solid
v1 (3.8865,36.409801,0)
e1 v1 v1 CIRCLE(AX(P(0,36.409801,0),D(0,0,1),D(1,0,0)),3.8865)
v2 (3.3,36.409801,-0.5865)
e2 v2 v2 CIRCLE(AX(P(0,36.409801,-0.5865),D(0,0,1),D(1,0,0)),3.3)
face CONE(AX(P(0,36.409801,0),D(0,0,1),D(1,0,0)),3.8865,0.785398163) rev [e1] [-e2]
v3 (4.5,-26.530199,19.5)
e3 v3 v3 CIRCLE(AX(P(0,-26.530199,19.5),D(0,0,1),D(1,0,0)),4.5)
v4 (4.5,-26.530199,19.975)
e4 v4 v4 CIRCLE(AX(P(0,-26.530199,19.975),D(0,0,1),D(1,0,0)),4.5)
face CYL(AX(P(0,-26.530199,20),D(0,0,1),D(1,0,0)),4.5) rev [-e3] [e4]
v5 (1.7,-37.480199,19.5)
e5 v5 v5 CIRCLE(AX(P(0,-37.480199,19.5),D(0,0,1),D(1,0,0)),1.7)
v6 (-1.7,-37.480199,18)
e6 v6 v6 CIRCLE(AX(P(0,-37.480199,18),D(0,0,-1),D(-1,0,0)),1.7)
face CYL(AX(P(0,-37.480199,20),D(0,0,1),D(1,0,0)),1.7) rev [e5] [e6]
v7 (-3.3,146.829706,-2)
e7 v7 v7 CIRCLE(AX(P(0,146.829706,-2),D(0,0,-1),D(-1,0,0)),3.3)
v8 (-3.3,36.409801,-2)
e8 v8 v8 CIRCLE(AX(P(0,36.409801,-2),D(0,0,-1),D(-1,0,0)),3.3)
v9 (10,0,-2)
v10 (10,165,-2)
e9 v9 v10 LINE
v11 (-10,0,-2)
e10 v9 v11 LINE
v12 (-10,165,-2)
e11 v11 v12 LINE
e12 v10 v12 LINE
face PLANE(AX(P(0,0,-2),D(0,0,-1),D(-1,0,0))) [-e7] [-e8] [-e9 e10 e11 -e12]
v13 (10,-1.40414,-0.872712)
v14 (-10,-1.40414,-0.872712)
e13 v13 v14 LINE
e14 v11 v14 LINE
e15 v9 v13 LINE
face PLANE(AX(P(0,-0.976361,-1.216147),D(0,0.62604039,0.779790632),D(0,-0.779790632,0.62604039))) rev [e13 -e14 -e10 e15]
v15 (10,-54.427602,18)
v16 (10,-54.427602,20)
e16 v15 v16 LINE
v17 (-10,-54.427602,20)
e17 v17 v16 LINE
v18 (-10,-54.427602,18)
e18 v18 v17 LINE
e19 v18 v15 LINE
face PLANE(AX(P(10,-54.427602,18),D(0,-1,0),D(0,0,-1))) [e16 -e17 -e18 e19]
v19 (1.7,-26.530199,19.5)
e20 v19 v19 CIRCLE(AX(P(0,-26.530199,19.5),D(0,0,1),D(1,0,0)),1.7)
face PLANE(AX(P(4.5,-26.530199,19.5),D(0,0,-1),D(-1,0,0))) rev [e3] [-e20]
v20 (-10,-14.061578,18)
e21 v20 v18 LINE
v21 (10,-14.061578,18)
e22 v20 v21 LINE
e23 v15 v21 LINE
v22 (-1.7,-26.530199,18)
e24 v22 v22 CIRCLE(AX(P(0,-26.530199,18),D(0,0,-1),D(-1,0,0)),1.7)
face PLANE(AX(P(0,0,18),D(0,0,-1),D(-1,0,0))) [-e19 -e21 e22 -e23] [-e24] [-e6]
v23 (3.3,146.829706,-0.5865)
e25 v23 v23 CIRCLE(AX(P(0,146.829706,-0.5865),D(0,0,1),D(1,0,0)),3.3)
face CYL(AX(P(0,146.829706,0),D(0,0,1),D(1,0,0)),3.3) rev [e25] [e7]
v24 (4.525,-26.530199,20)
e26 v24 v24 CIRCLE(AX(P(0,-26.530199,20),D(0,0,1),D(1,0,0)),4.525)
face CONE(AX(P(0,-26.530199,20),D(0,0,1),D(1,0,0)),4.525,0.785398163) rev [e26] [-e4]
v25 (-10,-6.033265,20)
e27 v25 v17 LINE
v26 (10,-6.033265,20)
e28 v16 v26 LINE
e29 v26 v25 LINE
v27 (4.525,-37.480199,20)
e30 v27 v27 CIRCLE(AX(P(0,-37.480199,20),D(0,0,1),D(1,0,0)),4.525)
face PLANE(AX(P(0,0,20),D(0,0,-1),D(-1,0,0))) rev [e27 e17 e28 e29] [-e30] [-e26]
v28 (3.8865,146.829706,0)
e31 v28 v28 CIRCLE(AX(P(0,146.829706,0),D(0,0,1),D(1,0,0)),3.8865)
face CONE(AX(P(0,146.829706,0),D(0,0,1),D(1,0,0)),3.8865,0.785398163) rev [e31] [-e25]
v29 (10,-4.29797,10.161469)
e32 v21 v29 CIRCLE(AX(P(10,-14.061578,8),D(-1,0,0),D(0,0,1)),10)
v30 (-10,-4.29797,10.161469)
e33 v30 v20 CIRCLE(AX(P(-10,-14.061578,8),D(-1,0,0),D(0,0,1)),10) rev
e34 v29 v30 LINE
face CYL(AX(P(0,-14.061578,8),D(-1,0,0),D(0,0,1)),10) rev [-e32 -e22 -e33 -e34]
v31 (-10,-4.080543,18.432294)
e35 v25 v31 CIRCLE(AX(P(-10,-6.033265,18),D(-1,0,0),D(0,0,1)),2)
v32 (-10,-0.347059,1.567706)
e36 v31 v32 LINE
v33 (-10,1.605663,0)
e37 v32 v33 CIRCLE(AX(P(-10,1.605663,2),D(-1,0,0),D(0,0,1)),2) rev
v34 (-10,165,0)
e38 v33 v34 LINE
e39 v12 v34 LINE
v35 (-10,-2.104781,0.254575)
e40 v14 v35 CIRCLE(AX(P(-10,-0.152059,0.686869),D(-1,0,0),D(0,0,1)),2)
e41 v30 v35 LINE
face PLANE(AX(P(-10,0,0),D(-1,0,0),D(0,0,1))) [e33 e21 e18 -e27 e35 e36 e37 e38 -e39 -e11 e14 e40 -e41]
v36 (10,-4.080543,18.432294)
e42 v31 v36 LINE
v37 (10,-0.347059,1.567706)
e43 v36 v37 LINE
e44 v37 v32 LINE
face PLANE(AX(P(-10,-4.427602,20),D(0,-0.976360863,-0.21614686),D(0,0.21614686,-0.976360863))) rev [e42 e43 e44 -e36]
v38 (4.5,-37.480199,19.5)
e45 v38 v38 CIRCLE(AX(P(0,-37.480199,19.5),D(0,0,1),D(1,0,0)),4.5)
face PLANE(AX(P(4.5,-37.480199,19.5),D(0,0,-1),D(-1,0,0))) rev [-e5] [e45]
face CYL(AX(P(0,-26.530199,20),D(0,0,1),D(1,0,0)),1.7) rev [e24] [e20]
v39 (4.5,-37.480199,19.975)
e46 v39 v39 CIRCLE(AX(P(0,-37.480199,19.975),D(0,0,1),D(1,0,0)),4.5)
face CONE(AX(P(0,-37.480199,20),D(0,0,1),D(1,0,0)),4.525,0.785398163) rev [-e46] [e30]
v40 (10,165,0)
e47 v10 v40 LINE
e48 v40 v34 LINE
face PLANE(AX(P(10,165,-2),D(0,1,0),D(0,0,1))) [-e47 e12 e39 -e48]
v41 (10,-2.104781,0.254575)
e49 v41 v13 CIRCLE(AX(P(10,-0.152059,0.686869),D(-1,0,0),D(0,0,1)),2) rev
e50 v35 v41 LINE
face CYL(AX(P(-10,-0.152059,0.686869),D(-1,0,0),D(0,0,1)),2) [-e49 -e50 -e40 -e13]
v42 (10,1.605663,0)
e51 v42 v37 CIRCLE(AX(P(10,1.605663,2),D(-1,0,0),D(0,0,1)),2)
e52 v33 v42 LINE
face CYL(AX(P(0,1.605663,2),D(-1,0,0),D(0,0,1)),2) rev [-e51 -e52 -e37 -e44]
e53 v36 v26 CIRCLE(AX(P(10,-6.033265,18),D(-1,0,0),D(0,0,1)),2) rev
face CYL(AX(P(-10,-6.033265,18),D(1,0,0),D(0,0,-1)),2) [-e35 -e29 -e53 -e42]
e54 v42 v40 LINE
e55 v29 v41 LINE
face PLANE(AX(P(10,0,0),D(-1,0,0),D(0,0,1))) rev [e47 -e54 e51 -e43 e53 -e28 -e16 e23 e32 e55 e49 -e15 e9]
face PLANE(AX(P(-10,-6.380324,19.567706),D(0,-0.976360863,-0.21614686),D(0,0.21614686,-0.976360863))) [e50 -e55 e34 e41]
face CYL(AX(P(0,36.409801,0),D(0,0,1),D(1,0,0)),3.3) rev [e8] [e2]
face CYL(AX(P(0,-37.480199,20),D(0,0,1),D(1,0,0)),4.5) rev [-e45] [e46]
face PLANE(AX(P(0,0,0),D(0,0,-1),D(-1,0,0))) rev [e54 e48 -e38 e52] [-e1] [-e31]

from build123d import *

# Parameters (mm, degrees)
ESTRUSIONE_SOTTILE1_DEPTH                    = 10
SCHIZZO4_W                                   = 20
SCHIZZO4_H                                   = 50
ESTRUSIONE_ESTRUSIONE1_DEPTH                 = 2
SCHIZZO1_W                                   = 20
SCHIZZO1_H                                   = 165
ESTRUSIONE_ESTRUSIONE2_DEPTH                 = 2
RACCORDO2_R                                  = 10
RACCORDO8_R                                  = 2
LOFT3_START                                  = -1.559581264
LOFT3_OUTLINE_W                              = 20
LOFT3_OUTLINE_H                              = 2.50416156
LOFT3_DEPTH                                  = 1.559581264
RACCORDO13_R                                 = 2
RACCORDO14_R                                 = 2
FORO_FILETTATO_G1_16_2_AT_2_COUNT            = 2
FORO_FILETTATO_G1_16_2_AT_2_PITCH            = 110.419904734
FORO_LAMATO_PER_BULLONE_M3_A_TESTA_E_2_COUNT = 2
FORO_LAMATO_PER_BULLONE_M3_A_TESTA_E_2_PITCH = 10.95


with BuildPart() as part:
    # Schizzo5 → Estrusione-Sottile1 (new, symmetric)
    with BuildSketch(Plane(origin=(0, 0, 0), x_dir=(0, 0, -1), z_dir=(1, 0, 0))):
        Polygon((-20, -4.427601882), (0, 0), (0.43229372, -1.952721726), (-19.56770628, -6.380323609), align=None)
    extrude(amount=ESTRUSIONE_SOTTILE1_DEPTH, both=True)

    # Schizzo4 → Estrusione-Estrusione1 (add)
    with BuildSketch(Plane.XY.offset(20)):
        with Locations((0, -29.427601882)):
            Rectangle(SCHIZZO4_W, SCHIZZO4_H)
    extrude(amount=-ESTRUSIONE_ESTRUSIONE1_DEPTH)

    # Raccordo2
    raccordo2_edges = [part.edges().sort_by_distance(p)[0] for p in [
        (0, -6.033264645, 18),
    ]]
    fillet(raccordo2_edges, radius=RACCORDO2_R)

    # Raccordo8
    raccordo8_edges = [part.edges().sort_by_distance(p)[0] for p in [
        (0, -4.427601882, 20),
    ]]
    fillet(raccordo8_edges, radius=RACCORDO8_R)



with BuildPart() as body_2:
    # Schizzo1 → Estrusione-Estrusione2 (new body)
    with BuildSketch(Plane.XY):
        with Locations((0, 82.5)):
            Rectangle(SCHIZZO1_W, SCHIZZO1_H)
    extrude(amount=-ESTRUSIONE_ESTRUSIONE2_DEPTH)


with BuildPart() as part_1:
    add(part.part)

    add(body_2.part)  # Loft3 merges body 2
    # Loft3: read off the stored shape, not the designer's step
    # Loft3 outline → Loft3 (add)
    with BuildSketch(Plane(origin=(0, 0, 0), x_dir=(1, 0, 0), z_dir=(0, 0.626040390160855, 0.779790632084821)).offset(LOFT3_START)):
        Rectangle(LOFT3_OUTLINE_W, LOFT3_OUTLINE_H)
    extrude(amount=LOFT3_DEPTH)

    # Raccordo13
    raccordo13_edges = [part_1.edges().sort_by_distance(p)[0] for p in [
        (0, -1.952721726, -0.43229372),
    ]]
    fillet(raccordo13_edges, radius=RACCORDO13_R)

    # Raccordo14
    raccordo14_edges = [part_1.edges().sort_by_distance(p)[0] for p in [
        (0, 0, 0),
    ]]
    fillet(raccordo14_edges, radius=RACCORDO14_R)

    # Schizzo11 → Foro filettato G1/16-2 (revolve, cut)
    with BuildSketch(Plane(origin=(0, 146.829705844, 0), x_dir=(0, -1, 0), z_dir=(1, 0, 0))):
        Polygon((0, 0), (0, 2.005), (3.3, 2.005), (3.3, 0.5865), (3.8865, 0), align=None)
    foro_filettato_g1_16_2 = revolve(axis=Axis((0, 146.829705844, 6.35), (0, 0, -1)), mode=Mode.SUBTRACT)

    # Foro filettato G1/16-2 at 2: Foro filettato G1/16-2 ×2
    with Locations(*[(0, -i * FORO_FILETTATO_G1_16_2_AT_2_PITCH, 0) for i in range(1, FORO_FILETTATO_G1_16_2_AT_2_COUNT)]):
        add(foro_filettato_g1_16_2, mode=Mode.SUBTRACT)

    # Schizzo27 → Foro lamato per Bullone M3 a testa esagonale-4 (revolve, cut)
    with BuildSketch(Plane(origin=(0, -26.530198891, 20), x_dir=(0, -1, 0), z_dir=(1, 0, 0))):
        Polygon((0, 0), (0, 22.005), (1.7, 22.005), (1.7, 0.5), (4.5, 0.5), (4.5, 0.025), (4.525, 0), align=None)
    foro_lamato_per_bullone_m3_a_testa_esago = revolve(axis=Axis((0, -26.530198891, 26.35), (0, 0, -1)), mode=Mode.SUBTRACT)

    # Foro lamato per Bullone M3 a testa e 2: Foro lamato per Bullone M3 a testa esagonale-4 ×2
    with Locations(*[(0, -i * FORO_LAMATO_PER_BULLONE_M3_A_TESTA_E_2_PITCH, 0) for i in range(1, FORO_LAMATO_PER_BULLONE_M3_A_TESTA_E_2_COUNT)]):
        add(foro_lamato_per_bullone_m3_a_testa_esago, mode=Mode.SUBTRACT)


solid = part_1.part
